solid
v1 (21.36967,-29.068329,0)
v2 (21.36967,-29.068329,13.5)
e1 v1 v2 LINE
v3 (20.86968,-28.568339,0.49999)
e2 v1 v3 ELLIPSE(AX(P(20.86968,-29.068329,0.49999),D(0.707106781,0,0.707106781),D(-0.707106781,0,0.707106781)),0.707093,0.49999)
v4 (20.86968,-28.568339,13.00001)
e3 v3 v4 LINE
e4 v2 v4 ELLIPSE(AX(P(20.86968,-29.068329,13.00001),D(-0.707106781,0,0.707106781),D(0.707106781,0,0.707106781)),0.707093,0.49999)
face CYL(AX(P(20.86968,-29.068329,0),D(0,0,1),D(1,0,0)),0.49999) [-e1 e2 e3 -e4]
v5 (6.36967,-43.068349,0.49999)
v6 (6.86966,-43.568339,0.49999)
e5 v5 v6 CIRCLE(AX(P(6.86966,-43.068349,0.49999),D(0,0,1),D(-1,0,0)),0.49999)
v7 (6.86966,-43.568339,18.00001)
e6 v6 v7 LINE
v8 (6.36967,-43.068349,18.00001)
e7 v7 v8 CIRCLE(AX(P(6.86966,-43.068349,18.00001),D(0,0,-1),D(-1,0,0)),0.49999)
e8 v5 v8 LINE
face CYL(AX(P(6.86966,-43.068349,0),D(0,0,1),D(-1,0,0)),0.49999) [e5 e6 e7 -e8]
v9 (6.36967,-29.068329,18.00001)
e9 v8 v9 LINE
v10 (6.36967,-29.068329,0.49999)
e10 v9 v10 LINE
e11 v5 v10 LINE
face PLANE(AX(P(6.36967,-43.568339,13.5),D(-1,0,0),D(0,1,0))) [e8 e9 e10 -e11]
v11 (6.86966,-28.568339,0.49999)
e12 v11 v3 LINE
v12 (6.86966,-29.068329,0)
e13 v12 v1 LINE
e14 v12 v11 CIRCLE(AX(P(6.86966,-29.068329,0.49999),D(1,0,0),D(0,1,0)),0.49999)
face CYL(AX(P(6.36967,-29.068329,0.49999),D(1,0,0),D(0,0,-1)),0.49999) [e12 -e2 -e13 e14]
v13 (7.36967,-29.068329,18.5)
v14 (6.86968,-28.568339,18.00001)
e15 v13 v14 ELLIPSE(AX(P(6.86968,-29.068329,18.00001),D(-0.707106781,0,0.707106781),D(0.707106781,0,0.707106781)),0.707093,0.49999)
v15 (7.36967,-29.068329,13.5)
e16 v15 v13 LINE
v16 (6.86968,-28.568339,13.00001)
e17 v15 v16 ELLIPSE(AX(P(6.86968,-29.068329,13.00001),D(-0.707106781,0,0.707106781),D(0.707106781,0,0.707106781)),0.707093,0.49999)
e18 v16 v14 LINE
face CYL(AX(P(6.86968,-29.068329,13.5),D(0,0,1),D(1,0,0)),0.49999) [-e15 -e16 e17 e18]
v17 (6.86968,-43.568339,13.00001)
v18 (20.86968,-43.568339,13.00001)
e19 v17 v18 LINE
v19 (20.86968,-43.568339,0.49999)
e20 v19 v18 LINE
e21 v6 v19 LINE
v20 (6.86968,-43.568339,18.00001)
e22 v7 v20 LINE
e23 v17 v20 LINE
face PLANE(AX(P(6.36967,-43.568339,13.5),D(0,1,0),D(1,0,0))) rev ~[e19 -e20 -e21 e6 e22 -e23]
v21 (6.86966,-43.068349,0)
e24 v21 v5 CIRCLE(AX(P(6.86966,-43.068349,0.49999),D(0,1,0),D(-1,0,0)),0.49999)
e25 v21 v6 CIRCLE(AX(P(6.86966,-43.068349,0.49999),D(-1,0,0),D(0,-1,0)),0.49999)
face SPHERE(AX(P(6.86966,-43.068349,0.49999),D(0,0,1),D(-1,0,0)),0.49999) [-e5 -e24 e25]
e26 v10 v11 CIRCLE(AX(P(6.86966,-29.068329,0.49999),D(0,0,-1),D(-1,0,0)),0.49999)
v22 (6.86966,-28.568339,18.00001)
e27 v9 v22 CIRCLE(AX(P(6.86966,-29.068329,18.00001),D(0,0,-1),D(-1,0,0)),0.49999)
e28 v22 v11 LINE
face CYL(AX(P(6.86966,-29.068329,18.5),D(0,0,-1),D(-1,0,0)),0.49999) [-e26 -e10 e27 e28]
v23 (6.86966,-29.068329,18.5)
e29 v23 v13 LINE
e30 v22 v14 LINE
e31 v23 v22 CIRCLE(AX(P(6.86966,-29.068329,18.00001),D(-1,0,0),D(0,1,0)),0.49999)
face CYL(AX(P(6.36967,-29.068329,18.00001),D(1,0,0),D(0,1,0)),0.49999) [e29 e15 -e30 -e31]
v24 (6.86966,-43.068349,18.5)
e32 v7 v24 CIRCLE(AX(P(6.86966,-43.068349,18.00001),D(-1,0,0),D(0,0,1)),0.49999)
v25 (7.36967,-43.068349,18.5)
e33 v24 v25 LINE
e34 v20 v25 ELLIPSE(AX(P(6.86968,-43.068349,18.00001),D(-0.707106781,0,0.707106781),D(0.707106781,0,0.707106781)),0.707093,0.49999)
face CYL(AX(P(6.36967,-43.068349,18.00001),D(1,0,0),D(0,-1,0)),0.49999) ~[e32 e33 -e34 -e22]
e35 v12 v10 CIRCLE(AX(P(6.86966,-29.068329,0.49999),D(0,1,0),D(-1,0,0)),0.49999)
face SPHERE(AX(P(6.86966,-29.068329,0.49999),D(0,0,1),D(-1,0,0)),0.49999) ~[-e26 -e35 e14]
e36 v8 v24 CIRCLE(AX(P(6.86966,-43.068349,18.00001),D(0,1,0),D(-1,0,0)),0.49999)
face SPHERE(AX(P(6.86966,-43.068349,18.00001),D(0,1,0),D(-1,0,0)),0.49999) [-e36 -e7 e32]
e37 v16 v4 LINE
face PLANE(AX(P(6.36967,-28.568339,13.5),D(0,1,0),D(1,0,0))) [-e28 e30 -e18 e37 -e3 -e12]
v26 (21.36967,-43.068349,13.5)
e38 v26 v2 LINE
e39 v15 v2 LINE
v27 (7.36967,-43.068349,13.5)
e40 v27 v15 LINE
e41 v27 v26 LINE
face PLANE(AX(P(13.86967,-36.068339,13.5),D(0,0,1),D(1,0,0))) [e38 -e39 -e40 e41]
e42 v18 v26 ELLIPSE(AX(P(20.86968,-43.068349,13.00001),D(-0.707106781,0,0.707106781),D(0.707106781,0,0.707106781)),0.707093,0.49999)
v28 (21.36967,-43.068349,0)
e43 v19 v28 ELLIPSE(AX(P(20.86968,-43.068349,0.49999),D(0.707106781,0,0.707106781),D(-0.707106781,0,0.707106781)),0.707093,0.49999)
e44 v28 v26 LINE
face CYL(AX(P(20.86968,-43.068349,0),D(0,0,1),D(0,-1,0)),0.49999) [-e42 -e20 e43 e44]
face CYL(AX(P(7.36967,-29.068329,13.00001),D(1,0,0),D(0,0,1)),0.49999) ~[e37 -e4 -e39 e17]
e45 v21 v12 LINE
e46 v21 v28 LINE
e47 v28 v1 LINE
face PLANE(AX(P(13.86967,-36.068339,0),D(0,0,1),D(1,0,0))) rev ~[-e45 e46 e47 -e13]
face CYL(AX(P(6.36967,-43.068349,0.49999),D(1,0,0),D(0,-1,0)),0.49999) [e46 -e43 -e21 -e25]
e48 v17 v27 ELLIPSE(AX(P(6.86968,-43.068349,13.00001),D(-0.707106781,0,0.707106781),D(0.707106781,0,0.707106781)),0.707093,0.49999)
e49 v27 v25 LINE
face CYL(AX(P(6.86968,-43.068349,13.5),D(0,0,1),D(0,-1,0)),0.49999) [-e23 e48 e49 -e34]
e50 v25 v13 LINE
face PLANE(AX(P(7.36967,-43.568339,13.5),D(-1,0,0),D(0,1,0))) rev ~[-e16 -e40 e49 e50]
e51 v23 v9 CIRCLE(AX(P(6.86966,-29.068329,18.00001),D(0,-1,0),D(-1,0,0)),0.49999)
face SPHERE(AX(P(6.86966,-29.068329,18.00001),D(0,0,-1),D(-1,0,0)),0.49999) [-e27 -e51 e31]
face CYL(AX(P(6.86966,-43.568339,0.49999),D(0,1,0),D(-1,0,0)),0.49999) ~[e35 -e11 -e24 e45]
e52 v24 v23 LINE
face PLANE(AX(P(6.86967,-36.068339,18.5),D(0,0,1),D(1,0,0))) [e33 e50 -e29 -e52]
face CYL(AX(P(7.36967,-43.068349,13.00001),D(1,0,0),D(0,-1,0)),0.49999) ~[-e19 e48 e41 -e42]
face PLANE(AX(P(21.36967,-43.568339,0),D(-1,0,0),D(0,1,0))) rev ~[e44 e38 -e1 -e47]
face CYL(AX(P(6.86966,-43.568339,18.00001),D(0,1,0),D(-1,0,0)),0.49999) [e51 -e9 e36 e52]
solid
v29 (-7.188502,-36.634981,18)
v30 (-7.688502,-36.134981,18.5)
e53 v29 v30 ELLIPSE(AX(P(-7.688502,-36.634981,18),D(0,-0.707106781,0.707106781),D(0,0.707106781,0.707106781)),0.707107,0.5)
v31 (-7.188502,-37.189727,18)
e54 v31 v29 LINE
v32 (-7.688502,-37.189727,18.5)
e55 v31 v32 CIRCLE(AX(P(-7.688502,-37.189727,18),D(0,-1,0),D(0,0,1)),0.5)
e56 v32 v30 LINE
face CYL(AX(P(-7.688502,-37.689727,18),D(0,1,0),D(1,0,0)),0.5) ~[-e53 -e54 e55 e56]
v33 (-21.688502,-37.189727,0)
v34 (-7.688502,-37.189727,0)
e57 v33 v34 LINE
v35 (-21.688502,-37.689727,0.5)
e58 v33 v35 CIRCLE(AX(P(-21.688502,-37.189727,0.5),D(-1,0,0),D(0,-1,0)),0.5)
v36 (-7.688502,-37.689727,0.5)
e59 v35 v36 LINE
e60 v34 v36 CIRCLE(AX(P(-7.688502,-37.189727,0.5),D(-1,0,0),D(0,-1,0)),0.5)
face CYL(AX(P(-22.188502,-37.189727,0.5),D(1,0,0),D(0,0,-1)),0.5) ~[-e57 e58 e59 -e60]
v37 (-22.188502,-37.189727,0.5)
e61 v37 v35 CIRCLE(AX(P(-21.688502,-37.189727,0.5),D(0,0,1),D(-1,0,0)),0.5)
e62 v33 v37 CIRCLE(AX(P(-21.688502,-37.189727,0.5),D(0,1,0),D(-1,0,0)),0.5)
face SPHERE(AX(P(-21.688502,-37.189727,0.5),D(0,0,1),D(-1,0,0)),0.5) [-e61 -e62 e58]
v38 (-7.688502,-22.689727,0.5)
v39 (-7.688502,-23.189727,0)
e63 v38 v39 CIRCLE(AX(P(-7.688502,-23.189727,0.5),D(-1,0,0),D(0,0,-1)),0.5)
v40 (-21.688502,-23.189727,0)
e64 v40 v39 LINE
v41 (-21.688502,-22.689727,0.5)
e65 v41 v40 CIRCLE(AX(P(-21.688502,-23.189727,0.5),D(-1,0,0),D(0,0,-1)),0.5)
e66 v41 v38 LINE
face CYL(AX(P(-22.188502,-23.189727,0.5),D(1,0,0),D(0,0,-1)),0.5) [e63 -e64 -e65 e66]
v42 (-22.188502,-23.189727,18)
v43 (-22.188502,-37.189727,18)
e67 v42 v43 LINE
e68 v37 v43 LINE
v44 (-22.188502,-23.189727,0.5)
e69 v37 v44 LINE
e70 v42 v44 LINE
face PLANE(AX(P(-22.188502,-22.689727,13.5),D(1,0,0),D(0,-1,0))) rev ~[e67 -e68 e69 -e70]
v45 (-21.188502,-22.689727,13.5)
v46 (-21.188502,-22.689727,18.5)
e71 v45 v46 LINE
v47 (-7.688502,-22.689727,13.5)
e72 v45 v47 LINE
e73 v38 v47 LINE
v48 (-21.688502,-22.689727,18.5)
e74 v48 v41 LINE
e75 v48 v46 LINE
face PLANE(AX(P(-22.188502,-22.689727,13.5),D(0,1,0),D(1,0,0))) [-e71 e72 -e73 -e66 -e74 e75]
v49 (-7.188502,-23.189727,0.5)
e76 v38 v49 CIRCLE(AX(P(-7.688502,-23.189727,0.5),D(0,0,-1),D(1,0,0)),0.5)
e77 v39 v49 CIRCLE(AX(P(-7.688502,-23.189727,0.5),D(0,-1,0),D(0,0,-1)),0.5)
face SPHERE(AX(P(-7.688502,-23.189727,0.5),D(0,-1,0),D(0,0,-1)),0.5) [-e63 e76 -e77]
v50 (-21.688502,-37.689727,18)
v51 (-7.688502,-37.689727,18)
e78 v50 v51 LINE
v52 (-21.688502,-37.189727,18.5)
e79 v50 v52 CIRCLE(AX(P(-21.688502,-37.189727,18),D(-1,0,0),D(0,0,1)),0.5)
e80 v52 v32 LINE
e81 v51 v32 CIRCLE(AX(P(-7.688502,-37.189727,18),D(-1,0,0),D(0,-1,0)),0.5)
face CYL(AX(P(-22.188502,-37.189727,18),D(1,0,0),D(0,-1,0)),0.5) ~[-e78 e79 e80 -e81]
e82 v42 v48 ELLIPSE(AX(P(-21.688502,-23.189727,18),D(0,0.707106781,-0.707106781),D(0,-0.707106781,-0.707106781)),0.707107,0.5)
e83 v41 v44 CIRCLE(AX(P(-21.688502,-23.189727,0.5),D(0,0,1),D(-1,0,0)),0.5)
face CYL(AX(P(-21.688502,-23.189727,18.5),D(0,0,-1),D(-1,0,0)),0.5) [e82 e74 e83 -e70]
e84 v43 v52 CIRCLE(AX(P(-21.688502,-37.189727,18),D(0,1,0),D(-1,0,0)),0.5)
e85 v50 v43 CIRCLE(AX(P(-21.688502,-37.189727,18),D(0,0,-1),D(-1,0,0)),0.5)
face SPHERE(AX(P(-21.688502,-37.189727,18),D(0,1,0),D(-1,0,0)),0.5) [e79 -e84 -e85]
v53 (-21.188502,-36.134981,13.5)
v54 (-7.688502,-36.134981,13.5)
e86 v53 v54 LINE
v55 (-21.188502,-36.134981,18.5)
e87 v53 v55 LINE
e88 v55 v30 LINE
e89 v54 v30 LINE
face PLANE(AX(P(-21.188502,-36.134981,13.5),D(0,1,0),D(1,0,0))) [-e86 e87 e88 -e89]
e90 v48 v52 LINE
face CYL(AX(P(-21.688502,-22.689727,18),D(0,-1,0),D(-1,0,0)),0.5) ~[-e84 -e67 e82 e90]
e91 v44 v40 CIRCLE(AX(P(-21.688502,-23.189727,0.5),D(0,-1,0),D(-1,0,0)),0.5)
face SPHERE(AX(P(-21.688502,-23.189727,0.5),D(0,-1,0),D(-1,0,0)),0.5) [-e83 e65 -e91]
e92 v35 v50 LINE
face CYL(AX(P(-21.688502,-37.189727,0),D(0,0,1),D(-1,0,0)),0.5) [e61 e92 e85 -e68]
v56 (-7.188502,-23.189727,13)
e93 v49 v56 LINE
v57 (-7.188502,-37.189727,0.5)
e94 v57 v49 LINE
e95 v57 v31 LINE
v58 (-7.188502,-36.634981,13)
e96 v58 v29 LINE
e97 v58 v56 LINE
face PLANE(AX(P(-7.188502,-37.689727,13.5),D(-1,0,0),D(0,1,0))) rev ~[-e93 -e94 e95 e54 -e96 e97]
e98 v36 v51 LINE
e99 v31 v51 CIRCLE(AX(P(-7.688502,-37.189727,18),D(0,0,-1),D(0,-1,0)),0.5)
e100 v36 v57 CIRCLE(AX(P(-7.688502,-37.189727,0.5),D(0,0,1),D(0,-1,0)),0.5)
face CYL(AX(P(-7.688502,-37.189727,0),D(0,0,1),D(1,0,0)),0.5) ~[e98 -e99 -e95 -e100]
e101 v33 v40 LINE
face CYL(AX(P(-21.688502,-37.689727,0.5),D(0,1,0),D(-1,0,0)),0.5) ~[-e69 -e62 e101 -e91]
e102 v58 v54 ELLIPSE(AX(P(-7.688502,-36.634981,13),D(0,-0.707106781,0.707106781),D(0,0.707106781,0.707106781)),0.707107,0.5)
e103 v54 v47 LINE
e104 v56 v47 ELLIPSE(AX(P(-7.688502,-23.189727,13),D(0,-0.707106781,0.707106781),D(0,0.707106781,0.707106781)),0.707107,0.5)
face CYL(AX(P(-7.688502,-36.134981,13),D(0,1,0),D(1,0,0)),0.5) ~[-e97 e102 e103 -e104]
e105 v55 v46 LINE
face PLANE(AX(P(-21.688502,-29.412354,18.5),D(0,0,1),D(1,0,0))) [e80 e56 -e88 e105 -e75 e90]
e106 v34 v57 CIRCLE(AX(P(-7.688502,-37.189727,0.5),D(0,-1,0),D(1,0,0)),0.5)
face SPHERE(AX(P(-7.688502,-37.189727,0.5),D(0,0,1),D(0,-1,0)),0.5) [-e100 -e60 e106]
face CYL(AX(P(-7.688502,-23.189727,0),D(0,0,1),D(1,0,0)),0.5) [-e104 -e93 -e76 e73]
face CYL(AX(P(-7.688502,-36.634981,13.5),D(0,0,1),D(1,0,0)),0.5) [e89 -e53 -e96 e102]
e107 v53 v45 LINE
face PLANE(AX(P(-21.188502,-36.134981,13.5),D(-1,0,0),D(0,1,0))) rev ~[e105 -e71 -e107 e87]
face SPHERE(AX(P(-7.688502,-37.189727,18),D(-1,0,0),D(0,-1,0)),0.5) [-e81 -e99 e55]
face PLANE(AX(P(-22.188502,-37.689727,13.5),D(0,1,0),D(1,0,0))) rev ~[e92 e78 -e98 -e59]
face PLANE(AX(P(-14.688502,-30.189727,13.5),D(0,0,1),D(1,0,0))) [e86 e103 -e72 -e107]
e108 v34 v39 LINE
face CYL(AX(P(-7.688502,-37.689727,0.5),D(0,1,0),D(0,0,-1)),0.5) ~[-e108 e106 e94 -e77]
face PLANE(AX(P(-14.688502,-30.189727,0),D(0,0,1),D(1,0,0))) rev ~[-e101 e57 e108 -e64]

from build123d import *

# Parameters (mm, degrees)
F0_W     = 15
F0_H     = 15
F1_DEPTH = 13.5
F2_W     = 1
F2_H     = 13.4452538192
F2_H_2   = 1.5547461808
F2_W_2   = 14
F3_DEPTH = 5
F4_DEPTH = 5
F5_R     = 0.5
F6_W     = 15
F6_H     = 15
F7_DEPTH = 13.5
F8_W     = 1
F8_H     = 15
F9_DEPTH = 5
F10_R    = 0.49999


# Not quite as in the source:
# - a fillet or chamfer is up to 0.001 mm smaller than in the source, because OpenCascade refuses the exact size


with BuildPart() as f1:
    # F0 (on Top) → F1 (new body)
    with BuildSketch(Plane.XY):
        with Locations((-14.6885017678, -30.1897267997)):
            Rectangle(F0_W, F0_H)
    extrude(amount=F1_DEPTH)

    # F2 (on face) → F3 (join)
    with BuildSketch(Plane.XY.offset(13.5)):
        with Locations((-21.6885017678, -29.4123537093)):
            Rectangle(F2_W, F2_H)
        with Locations((-21.6885017678, -36.9123537093)):
            Rectangle(F2_W, F2_H_2)
        with Locations((-14.1885017678, -36.9123537093)):
            Rectangle(F2_W_2, F2_H_2)
    extrude(amount=F3_DEPTH)

    # F2 (on face) → F4 (join)
    with BuildSketch(Plane.XY.offset(13.5)):
        with Locations((-21.6885017678, -29.4123537093)):
            Rectangle(F2_W, F2_H)
        with Locations((-21.6885017678, -36.9123537093)):
            Rectangle(F2_W, F2_H_2)
        with Locations((-14.1885017678, -36.9123537093)):
            Rectangle(F2_W_2, F2_H_2)
    extrude(amount=F4_DEPTH)

    # F5
    f5_edges = [f1.edges().sort_by_distance(p)[0] for p in [
        (-22.188502, -30.189727, 18.5),
        (-22.188502, -37.689727, 9.25),
        (-22.188502, -30.189727, 0),
        (-22.188502, -22.689727, 9.25),
        (-14.688502, -37.689727, 18.5),
        (-7.188502, -37.689727, 9.25),
        (-14.688502, -37.689727, 0),
        (-7.188502, -30.189727, 0),
        (-14.688502, -22.689727, 0),
        (-7.188502, -36.912354, 18.5),
        (-7.188502, -36.134981, 16),
        (-7.188502, -29.412354, 13.5),
        (-7.188502, -22.689727, 6.75),
    ]]
    fillet(f5_edges, radius=F5_R)


with BuildPart() as f7:
    # F6 (on Top) → F7 (new body)
    with BuildSketch(Plane.XY):
        with Locations((13.8696695864, -36.0683391988)):
            Rectangle(F6_W, F6_H)
    extrude(amount=F7_DEPTH)

    # F8 (on face) → F9 (join)
    with BuildSketch(Plane.XY.offset(13.5)):
        with Locations((6.8696695864, -36.0683391988)):
            Rectangle(F8_W, F8_H)
    extrude(amount=F9_DEPTH)

    # F10 (radius 0.5 in the source; OpenCascade refuses exactly that, so slightly less here)
    f10_edges = [f7.edges().sort_by_distance(p)[0] for p in [
        (6.36967, -28.568339, 9.25),
        (6.36967, -36.068339, 18.5),
        (6.36967, -43.568339, 9.25),
        (6.36967, -36.068339, 0),
        (6.86967, -43.568339, 18.5),
        (7.36967, -43.568339, 16),
        (14.36967, -43.568339, 13.5),
        (21.36967, -43.568339, 6.75),
        (13.86967, -43.568339, 0),
        (21.36967, -28.568339, 6.75),
        (14.36967, -28.568339, 13.5),
        (7.36967, -28.568339, 16),
        (6.86967, -28.568339, 18.5),
        (13.86967, -28.568339, 0),
    ]]
    fillet(f10_edges, radius=F10_R)


solid = Compound([f1.part, f7.part])
